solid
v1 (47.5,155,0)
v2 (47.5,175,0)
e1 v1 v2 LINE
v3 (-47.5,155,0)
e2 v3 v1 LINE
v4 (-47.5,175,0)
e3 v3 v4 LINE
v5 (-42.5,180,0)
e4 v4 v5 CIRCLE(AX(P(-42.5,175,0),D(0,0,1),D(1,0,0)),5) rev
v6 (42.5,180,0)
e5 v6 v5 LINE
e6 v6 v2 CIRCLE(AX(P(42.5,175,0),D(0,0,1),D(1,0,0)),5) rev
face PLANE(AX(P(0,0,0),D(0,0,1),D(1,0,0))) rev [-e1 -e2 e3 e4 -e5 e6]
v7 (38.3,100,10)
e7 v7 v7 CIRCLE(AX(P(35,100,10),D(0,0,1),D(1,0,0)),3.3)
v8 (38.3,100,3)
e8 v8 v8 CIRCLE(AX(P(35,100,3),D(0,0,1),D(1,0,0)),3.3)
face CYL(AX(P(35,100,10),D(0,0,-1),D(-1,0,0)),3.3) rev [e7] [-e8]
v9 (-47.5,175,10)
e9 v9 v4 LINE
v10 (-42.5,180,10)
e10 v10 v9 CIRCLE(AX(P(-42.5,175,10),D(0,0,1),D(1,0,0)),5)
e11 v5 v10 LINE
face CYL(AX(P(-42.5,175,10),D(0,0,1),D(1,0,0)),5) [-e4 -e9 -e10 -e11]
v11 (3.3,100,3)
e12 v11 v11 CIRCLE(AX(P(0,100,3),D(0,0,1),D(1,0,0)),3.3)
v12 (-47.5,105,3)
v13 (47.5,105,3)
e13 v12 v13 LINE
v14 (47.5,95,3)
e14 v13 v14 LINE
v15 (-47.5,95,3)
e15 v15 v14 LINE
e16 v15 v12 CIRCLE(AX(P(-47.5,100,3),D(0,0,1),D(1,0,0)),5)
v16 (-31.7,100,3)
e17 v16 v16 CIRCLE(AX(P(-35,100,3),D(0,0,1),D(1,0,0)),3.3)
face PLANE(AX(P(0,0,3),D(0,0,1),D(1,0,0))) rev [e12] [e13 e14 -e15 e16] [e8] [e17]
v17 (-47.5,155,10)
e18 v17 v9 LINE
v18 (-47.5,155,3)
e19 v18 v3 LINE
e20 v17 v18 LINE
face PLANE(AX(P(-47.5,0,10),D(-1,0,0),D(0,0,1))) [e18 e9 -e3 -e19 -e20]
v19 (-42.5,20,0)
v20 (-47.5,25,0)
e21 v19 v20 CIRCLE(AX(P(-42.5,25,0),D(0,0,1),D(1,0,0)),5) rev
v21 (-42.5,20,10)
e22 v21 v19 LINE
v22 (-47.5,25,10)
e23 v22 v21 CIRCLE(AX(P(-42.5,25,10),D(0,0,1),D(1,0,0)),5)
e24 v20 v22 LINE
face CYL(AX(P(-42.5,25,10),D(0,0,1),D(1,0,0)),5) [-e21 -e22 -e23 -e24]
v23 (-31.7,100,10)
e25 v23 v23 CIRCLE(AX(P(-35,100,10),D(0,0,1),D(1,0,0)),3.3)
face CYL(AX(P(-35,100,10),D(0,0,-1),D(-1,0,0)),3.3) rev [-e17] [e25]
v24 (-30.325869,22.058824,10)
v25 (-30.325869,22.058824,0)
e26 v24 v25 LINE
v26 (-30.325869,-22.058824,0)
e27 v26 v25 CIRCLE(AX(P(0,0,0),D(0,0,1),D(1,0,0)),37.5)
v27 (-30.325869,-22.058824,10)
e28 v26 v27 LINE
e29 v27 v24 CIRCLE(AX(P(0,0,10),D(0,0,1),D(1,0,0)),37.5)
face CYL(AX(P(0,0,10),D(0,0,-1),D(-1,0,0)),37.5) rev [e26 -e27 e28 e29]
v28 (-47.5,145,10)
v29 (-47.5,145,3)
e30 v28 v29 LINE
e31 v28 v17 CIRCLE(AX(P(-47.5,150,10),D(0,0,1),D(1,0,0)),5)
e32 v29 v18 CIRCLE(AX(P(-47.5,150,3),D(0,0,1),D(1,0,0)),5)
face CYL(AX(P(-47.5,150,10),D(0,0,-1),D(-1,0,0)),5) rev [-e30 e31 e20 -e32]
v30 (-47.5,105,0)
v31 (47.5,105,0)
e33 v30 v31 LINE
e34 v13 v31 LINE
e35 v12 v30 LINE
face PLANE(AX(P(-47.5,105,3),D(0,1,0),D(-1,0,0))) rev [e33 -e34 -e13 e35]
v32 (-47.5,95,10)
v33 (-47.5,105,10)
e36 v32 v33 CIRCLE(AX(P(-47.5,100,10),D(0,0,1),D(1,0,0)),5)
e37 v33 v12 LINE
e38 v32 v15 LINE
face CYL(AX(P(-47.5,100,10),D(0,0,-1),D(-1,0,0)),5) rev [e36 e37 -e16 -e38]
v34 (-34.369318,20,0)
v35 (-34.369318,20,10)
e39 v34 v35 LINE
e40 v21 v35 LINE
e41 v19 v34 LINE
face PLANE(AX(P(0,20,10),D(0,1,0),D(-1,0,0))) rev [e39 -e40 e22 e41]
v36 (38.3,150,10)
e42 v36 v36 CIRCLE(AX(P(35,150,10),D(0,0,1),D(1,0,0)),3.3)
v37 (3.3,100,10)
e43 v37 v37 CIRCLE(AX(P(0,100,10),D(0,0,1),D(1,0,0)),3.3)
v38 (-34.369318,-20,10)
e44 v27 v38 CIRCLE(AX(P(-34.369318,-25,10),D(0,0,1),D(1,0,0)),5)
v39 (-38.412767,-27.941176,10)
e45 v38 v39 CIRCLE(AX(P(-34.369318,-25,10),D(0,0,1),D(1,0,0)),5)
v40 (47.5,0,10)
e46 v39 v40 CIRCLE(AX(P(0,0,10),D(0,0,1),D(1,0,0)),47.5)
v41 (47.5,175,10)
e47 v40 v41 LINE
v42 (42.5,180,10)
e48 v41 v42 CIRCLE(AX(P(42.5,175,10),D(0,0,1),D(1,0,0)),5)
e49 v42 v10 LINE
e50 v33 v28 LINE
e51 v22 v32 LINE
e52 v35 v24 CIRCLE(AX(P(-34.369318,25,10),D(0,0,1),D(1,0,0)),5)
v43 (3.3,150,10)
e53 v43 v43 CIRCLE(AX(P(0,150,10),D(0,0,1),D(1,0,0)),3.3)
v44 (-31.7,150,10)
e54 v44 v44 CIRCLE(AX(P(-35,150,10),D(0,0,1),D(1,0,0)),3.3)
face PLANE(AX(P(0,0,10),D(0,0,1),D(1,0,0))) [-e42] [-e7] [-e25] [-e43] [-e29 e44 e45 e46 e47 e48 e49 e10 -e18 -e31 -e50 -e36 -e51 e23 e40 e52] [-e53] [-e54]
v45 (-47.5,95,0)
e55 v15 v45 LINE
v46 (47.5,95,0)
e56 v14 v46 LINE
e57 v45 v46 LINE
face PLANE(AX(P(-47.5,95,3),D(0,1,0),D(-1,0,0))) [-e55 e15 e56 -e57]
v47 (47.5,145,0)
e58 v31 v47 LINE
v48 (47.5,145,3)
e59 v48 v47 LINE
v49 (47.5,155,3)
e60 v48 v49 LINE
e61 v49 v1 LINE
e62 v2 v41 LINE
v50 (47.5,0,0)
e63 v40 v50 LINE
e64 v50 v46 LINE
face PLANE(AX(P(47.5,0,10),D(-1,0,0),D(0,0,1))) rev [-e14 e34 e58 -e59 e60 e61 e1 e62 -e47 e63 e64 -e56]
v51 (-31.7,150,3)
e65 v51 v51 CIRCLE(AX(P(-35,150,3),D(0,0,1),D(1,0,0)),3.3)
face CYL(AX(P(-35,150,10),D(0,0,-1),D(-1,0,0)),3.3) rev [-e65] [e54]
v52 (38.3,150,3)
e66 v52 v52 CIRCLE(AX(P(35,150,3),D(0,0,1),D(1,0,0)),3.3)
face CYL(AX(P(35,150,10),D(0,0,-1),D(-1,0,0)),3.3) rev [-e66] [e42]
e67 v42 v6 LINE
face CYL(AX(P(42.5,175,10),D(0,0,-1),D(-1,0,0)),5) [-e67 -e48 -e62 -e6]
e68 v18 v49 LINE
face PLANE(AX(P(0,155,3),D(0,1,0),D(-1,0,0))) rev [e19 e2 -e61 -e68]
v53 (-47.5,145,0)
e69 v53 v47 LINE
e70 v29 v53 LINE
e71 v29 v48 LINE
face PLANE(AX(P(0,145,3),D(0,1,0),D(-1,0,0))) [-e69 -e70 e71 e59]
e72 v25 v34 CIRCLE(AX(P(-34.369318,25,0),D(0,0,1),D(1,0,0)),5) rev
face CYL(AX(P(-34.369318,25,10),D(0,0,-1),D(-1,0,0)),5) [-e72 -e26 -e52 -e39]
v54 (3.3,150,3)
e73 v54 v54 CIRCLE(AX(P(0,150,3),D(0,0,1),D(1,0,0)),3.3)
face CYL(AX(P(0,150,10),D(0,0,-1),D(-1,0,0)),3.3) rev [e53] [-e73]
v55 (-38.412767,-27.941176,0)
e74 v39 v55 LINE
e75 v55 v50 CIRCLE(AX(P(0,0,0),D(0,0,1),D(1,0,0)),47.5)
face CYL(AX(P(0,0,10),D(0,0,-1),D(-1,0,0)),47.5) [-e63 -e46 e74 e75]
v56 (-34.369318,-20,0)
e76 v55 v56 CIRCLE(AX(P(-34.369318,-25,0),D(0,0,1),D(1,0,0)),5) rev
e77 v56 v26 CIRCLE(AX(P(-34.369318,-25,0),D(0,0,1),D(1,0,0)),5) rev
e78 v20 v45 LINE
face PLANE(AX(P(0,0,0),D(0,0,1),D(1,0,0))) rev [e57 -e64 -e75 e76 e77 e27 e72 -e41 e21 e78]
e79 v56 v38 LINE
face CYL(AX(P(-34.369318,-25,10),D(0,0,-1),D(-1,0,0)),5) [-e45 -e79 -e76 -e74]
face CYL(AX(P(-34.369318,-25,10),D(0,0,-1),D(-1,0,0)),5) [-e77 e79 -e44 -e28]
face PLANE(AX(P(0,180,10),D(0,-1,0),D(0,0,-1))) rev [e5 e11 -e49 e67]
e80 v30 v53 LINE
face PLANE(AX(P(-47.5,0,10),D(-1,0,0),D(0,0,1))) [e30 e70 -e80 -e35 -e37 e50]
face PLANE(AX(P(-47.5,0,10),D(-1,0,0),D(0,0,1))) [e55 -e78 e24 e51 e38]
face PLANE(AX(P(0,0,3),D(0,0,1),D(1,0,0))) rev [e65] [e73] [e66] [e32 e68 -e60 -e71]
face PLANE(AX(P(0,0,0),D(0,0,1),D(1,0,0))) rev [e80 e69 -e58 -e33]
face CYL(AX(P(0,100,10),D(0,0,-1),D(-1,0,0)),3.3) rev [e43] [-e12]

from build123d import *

# Parameters (mm, degrees)
SKETCH_1_R          = 3.3
EXTRUDE_1_DEPTH     = 10
SKETCH_1_4_R        = 3.3
CUT_EXTRUDE_1_DEPTH = 3
FILLET_4_R          = 5
FILLET_8_R          = 5


with BuildPart() as part:
    # 스케치1 → 보스-돌출1 (new body)
    with BuildSketch(Plane.XY):
        with BuildLine():
            Line((-47.5, 95), (-47.5, 20))
            Line((-47.5, 20), (-31.721443851, 20))
            ThreePointArc((-31.721443851, 20), (37.5, 0), (-31.721443851, -20))
            Line((-31.721443851, -20), (-43.084219849, -20))
            ThreePointArc((-43.084219849, -20), (10.240838764, -46.382919501), (47.5, 0))
            Line((47.5, 0), (47.5, 180))
            Line((47.5, 180), (-47.5, 180))
            Line((-47.5, 180), (-47.5, 155))
            ThreePointArc((-47.5, 155), (-42.5, 150), (-47.5, 145))
            Line((-47.5, 145), (-47.5, 105))
            ThreePointArc((-47.5, 105), (-42.5, 100), (-47.5, 95))
        make_face()
        with Locations((35, 100)):
            Circle(SKETCH_1_R, mode=Mode.SUBTRACT)
        with Locations((-35, 100)):
            Circle(SKETCH_1_R, mode=Mode.SUBTRACT)
        with Locations((0, 100)):
            Circle(SKETCH_1_R, mode=Mode.SUBTRACT)
        with Locations((35, 150)):
            Circle(SKETCH_1_R, mode=Mode.SUBTRACT)
        with Locations((-35, 150)):
            Circle(SKETCH_1_R, mode=Mode.SUBTRACT)
        with Locations((0, 150)):
            Circle(SKETCH_1_R, mode=Mode.SUBTRACT)
    extrude(amount=EXTRUDE_1_DEPTH)

    # 스케치1<4> → 컷-돌출1 (cut)
    # profile 1 of 2: a face of its own
    with BuildSketch(Plane.XY):
        with BuildLine():
            ThreePointArc((-47.5, 105), (-42.5, 100), (-47.5, 95))
            Line((-47.5, 95), (47.5, 95))
            Line((47.5, 95), (47.5, 105))
            Line((47.5, 105), (-47.5, 105))
        make_face()
        with Locations((-35, 100)):
            Circle(SKETCH_1_4_R, mode=Mode.SUBTRACT)
        with Locations((0, 100)):
            Circle(SKETCH_1_4_R, mode=Mode.SUBTRACT)
        with Locations((35, 100)):
            Circle(SKETCH_1_4_R, mode=Mode.SUBTRACT)
    # profile 2 of 2: a face of its own
    with BuildSketch(Plane.XY):
        with BuildLine():
            ThreePointArc((-47.5, 155), (-42.5, 150), (-47.5, 145))
            Line((-47.5, 145), (47.5, 145))
            Line((47.5, 145), (47.5, 155))
            Line((47.5, 155), (-47.5, 155))
        make_face()
        with Locations((-35, 150)):
            Circle(SKETCH_1_4_R, mode=Mode.SUBTRACT)
        with Locations((0, 150)):
            Circle(SKETCH_1_4_R, mode=Mode.SUBTRACT)
        with Locations((35, 150)):
            Circle(SKETCH_1_4_R, mode=Mode.SUBTRACT)
    extrude(amount=CUT_EXTRUDE_1_DEPTH, mode=Mode.SUBTRACT)

    # 필렛4
    fillet_4_edges = [part.edges().sort_by_distance(p)[0] for p in [
        (-31.721443851, 20, 5),
        (-47.5, 20, 5),
        (-31.721443851, -20, 5),
        (-43.084219849, -20, 5),
    ]]
    fillet(fillet_4_edges, radius=FILLET_4_R - 0.0001)  # a hair under: the kernel refuses the full size

    # 필렛8
    fillet_8_edges = [part.edges().sort_by_distance(p)[0] for p in [
        (-47.5, 180, 5),
        (47.5, 180, 5),
    ]]
    fillet(fillet_8_edges, radius=FILLET_8_R)


solid = part.part
